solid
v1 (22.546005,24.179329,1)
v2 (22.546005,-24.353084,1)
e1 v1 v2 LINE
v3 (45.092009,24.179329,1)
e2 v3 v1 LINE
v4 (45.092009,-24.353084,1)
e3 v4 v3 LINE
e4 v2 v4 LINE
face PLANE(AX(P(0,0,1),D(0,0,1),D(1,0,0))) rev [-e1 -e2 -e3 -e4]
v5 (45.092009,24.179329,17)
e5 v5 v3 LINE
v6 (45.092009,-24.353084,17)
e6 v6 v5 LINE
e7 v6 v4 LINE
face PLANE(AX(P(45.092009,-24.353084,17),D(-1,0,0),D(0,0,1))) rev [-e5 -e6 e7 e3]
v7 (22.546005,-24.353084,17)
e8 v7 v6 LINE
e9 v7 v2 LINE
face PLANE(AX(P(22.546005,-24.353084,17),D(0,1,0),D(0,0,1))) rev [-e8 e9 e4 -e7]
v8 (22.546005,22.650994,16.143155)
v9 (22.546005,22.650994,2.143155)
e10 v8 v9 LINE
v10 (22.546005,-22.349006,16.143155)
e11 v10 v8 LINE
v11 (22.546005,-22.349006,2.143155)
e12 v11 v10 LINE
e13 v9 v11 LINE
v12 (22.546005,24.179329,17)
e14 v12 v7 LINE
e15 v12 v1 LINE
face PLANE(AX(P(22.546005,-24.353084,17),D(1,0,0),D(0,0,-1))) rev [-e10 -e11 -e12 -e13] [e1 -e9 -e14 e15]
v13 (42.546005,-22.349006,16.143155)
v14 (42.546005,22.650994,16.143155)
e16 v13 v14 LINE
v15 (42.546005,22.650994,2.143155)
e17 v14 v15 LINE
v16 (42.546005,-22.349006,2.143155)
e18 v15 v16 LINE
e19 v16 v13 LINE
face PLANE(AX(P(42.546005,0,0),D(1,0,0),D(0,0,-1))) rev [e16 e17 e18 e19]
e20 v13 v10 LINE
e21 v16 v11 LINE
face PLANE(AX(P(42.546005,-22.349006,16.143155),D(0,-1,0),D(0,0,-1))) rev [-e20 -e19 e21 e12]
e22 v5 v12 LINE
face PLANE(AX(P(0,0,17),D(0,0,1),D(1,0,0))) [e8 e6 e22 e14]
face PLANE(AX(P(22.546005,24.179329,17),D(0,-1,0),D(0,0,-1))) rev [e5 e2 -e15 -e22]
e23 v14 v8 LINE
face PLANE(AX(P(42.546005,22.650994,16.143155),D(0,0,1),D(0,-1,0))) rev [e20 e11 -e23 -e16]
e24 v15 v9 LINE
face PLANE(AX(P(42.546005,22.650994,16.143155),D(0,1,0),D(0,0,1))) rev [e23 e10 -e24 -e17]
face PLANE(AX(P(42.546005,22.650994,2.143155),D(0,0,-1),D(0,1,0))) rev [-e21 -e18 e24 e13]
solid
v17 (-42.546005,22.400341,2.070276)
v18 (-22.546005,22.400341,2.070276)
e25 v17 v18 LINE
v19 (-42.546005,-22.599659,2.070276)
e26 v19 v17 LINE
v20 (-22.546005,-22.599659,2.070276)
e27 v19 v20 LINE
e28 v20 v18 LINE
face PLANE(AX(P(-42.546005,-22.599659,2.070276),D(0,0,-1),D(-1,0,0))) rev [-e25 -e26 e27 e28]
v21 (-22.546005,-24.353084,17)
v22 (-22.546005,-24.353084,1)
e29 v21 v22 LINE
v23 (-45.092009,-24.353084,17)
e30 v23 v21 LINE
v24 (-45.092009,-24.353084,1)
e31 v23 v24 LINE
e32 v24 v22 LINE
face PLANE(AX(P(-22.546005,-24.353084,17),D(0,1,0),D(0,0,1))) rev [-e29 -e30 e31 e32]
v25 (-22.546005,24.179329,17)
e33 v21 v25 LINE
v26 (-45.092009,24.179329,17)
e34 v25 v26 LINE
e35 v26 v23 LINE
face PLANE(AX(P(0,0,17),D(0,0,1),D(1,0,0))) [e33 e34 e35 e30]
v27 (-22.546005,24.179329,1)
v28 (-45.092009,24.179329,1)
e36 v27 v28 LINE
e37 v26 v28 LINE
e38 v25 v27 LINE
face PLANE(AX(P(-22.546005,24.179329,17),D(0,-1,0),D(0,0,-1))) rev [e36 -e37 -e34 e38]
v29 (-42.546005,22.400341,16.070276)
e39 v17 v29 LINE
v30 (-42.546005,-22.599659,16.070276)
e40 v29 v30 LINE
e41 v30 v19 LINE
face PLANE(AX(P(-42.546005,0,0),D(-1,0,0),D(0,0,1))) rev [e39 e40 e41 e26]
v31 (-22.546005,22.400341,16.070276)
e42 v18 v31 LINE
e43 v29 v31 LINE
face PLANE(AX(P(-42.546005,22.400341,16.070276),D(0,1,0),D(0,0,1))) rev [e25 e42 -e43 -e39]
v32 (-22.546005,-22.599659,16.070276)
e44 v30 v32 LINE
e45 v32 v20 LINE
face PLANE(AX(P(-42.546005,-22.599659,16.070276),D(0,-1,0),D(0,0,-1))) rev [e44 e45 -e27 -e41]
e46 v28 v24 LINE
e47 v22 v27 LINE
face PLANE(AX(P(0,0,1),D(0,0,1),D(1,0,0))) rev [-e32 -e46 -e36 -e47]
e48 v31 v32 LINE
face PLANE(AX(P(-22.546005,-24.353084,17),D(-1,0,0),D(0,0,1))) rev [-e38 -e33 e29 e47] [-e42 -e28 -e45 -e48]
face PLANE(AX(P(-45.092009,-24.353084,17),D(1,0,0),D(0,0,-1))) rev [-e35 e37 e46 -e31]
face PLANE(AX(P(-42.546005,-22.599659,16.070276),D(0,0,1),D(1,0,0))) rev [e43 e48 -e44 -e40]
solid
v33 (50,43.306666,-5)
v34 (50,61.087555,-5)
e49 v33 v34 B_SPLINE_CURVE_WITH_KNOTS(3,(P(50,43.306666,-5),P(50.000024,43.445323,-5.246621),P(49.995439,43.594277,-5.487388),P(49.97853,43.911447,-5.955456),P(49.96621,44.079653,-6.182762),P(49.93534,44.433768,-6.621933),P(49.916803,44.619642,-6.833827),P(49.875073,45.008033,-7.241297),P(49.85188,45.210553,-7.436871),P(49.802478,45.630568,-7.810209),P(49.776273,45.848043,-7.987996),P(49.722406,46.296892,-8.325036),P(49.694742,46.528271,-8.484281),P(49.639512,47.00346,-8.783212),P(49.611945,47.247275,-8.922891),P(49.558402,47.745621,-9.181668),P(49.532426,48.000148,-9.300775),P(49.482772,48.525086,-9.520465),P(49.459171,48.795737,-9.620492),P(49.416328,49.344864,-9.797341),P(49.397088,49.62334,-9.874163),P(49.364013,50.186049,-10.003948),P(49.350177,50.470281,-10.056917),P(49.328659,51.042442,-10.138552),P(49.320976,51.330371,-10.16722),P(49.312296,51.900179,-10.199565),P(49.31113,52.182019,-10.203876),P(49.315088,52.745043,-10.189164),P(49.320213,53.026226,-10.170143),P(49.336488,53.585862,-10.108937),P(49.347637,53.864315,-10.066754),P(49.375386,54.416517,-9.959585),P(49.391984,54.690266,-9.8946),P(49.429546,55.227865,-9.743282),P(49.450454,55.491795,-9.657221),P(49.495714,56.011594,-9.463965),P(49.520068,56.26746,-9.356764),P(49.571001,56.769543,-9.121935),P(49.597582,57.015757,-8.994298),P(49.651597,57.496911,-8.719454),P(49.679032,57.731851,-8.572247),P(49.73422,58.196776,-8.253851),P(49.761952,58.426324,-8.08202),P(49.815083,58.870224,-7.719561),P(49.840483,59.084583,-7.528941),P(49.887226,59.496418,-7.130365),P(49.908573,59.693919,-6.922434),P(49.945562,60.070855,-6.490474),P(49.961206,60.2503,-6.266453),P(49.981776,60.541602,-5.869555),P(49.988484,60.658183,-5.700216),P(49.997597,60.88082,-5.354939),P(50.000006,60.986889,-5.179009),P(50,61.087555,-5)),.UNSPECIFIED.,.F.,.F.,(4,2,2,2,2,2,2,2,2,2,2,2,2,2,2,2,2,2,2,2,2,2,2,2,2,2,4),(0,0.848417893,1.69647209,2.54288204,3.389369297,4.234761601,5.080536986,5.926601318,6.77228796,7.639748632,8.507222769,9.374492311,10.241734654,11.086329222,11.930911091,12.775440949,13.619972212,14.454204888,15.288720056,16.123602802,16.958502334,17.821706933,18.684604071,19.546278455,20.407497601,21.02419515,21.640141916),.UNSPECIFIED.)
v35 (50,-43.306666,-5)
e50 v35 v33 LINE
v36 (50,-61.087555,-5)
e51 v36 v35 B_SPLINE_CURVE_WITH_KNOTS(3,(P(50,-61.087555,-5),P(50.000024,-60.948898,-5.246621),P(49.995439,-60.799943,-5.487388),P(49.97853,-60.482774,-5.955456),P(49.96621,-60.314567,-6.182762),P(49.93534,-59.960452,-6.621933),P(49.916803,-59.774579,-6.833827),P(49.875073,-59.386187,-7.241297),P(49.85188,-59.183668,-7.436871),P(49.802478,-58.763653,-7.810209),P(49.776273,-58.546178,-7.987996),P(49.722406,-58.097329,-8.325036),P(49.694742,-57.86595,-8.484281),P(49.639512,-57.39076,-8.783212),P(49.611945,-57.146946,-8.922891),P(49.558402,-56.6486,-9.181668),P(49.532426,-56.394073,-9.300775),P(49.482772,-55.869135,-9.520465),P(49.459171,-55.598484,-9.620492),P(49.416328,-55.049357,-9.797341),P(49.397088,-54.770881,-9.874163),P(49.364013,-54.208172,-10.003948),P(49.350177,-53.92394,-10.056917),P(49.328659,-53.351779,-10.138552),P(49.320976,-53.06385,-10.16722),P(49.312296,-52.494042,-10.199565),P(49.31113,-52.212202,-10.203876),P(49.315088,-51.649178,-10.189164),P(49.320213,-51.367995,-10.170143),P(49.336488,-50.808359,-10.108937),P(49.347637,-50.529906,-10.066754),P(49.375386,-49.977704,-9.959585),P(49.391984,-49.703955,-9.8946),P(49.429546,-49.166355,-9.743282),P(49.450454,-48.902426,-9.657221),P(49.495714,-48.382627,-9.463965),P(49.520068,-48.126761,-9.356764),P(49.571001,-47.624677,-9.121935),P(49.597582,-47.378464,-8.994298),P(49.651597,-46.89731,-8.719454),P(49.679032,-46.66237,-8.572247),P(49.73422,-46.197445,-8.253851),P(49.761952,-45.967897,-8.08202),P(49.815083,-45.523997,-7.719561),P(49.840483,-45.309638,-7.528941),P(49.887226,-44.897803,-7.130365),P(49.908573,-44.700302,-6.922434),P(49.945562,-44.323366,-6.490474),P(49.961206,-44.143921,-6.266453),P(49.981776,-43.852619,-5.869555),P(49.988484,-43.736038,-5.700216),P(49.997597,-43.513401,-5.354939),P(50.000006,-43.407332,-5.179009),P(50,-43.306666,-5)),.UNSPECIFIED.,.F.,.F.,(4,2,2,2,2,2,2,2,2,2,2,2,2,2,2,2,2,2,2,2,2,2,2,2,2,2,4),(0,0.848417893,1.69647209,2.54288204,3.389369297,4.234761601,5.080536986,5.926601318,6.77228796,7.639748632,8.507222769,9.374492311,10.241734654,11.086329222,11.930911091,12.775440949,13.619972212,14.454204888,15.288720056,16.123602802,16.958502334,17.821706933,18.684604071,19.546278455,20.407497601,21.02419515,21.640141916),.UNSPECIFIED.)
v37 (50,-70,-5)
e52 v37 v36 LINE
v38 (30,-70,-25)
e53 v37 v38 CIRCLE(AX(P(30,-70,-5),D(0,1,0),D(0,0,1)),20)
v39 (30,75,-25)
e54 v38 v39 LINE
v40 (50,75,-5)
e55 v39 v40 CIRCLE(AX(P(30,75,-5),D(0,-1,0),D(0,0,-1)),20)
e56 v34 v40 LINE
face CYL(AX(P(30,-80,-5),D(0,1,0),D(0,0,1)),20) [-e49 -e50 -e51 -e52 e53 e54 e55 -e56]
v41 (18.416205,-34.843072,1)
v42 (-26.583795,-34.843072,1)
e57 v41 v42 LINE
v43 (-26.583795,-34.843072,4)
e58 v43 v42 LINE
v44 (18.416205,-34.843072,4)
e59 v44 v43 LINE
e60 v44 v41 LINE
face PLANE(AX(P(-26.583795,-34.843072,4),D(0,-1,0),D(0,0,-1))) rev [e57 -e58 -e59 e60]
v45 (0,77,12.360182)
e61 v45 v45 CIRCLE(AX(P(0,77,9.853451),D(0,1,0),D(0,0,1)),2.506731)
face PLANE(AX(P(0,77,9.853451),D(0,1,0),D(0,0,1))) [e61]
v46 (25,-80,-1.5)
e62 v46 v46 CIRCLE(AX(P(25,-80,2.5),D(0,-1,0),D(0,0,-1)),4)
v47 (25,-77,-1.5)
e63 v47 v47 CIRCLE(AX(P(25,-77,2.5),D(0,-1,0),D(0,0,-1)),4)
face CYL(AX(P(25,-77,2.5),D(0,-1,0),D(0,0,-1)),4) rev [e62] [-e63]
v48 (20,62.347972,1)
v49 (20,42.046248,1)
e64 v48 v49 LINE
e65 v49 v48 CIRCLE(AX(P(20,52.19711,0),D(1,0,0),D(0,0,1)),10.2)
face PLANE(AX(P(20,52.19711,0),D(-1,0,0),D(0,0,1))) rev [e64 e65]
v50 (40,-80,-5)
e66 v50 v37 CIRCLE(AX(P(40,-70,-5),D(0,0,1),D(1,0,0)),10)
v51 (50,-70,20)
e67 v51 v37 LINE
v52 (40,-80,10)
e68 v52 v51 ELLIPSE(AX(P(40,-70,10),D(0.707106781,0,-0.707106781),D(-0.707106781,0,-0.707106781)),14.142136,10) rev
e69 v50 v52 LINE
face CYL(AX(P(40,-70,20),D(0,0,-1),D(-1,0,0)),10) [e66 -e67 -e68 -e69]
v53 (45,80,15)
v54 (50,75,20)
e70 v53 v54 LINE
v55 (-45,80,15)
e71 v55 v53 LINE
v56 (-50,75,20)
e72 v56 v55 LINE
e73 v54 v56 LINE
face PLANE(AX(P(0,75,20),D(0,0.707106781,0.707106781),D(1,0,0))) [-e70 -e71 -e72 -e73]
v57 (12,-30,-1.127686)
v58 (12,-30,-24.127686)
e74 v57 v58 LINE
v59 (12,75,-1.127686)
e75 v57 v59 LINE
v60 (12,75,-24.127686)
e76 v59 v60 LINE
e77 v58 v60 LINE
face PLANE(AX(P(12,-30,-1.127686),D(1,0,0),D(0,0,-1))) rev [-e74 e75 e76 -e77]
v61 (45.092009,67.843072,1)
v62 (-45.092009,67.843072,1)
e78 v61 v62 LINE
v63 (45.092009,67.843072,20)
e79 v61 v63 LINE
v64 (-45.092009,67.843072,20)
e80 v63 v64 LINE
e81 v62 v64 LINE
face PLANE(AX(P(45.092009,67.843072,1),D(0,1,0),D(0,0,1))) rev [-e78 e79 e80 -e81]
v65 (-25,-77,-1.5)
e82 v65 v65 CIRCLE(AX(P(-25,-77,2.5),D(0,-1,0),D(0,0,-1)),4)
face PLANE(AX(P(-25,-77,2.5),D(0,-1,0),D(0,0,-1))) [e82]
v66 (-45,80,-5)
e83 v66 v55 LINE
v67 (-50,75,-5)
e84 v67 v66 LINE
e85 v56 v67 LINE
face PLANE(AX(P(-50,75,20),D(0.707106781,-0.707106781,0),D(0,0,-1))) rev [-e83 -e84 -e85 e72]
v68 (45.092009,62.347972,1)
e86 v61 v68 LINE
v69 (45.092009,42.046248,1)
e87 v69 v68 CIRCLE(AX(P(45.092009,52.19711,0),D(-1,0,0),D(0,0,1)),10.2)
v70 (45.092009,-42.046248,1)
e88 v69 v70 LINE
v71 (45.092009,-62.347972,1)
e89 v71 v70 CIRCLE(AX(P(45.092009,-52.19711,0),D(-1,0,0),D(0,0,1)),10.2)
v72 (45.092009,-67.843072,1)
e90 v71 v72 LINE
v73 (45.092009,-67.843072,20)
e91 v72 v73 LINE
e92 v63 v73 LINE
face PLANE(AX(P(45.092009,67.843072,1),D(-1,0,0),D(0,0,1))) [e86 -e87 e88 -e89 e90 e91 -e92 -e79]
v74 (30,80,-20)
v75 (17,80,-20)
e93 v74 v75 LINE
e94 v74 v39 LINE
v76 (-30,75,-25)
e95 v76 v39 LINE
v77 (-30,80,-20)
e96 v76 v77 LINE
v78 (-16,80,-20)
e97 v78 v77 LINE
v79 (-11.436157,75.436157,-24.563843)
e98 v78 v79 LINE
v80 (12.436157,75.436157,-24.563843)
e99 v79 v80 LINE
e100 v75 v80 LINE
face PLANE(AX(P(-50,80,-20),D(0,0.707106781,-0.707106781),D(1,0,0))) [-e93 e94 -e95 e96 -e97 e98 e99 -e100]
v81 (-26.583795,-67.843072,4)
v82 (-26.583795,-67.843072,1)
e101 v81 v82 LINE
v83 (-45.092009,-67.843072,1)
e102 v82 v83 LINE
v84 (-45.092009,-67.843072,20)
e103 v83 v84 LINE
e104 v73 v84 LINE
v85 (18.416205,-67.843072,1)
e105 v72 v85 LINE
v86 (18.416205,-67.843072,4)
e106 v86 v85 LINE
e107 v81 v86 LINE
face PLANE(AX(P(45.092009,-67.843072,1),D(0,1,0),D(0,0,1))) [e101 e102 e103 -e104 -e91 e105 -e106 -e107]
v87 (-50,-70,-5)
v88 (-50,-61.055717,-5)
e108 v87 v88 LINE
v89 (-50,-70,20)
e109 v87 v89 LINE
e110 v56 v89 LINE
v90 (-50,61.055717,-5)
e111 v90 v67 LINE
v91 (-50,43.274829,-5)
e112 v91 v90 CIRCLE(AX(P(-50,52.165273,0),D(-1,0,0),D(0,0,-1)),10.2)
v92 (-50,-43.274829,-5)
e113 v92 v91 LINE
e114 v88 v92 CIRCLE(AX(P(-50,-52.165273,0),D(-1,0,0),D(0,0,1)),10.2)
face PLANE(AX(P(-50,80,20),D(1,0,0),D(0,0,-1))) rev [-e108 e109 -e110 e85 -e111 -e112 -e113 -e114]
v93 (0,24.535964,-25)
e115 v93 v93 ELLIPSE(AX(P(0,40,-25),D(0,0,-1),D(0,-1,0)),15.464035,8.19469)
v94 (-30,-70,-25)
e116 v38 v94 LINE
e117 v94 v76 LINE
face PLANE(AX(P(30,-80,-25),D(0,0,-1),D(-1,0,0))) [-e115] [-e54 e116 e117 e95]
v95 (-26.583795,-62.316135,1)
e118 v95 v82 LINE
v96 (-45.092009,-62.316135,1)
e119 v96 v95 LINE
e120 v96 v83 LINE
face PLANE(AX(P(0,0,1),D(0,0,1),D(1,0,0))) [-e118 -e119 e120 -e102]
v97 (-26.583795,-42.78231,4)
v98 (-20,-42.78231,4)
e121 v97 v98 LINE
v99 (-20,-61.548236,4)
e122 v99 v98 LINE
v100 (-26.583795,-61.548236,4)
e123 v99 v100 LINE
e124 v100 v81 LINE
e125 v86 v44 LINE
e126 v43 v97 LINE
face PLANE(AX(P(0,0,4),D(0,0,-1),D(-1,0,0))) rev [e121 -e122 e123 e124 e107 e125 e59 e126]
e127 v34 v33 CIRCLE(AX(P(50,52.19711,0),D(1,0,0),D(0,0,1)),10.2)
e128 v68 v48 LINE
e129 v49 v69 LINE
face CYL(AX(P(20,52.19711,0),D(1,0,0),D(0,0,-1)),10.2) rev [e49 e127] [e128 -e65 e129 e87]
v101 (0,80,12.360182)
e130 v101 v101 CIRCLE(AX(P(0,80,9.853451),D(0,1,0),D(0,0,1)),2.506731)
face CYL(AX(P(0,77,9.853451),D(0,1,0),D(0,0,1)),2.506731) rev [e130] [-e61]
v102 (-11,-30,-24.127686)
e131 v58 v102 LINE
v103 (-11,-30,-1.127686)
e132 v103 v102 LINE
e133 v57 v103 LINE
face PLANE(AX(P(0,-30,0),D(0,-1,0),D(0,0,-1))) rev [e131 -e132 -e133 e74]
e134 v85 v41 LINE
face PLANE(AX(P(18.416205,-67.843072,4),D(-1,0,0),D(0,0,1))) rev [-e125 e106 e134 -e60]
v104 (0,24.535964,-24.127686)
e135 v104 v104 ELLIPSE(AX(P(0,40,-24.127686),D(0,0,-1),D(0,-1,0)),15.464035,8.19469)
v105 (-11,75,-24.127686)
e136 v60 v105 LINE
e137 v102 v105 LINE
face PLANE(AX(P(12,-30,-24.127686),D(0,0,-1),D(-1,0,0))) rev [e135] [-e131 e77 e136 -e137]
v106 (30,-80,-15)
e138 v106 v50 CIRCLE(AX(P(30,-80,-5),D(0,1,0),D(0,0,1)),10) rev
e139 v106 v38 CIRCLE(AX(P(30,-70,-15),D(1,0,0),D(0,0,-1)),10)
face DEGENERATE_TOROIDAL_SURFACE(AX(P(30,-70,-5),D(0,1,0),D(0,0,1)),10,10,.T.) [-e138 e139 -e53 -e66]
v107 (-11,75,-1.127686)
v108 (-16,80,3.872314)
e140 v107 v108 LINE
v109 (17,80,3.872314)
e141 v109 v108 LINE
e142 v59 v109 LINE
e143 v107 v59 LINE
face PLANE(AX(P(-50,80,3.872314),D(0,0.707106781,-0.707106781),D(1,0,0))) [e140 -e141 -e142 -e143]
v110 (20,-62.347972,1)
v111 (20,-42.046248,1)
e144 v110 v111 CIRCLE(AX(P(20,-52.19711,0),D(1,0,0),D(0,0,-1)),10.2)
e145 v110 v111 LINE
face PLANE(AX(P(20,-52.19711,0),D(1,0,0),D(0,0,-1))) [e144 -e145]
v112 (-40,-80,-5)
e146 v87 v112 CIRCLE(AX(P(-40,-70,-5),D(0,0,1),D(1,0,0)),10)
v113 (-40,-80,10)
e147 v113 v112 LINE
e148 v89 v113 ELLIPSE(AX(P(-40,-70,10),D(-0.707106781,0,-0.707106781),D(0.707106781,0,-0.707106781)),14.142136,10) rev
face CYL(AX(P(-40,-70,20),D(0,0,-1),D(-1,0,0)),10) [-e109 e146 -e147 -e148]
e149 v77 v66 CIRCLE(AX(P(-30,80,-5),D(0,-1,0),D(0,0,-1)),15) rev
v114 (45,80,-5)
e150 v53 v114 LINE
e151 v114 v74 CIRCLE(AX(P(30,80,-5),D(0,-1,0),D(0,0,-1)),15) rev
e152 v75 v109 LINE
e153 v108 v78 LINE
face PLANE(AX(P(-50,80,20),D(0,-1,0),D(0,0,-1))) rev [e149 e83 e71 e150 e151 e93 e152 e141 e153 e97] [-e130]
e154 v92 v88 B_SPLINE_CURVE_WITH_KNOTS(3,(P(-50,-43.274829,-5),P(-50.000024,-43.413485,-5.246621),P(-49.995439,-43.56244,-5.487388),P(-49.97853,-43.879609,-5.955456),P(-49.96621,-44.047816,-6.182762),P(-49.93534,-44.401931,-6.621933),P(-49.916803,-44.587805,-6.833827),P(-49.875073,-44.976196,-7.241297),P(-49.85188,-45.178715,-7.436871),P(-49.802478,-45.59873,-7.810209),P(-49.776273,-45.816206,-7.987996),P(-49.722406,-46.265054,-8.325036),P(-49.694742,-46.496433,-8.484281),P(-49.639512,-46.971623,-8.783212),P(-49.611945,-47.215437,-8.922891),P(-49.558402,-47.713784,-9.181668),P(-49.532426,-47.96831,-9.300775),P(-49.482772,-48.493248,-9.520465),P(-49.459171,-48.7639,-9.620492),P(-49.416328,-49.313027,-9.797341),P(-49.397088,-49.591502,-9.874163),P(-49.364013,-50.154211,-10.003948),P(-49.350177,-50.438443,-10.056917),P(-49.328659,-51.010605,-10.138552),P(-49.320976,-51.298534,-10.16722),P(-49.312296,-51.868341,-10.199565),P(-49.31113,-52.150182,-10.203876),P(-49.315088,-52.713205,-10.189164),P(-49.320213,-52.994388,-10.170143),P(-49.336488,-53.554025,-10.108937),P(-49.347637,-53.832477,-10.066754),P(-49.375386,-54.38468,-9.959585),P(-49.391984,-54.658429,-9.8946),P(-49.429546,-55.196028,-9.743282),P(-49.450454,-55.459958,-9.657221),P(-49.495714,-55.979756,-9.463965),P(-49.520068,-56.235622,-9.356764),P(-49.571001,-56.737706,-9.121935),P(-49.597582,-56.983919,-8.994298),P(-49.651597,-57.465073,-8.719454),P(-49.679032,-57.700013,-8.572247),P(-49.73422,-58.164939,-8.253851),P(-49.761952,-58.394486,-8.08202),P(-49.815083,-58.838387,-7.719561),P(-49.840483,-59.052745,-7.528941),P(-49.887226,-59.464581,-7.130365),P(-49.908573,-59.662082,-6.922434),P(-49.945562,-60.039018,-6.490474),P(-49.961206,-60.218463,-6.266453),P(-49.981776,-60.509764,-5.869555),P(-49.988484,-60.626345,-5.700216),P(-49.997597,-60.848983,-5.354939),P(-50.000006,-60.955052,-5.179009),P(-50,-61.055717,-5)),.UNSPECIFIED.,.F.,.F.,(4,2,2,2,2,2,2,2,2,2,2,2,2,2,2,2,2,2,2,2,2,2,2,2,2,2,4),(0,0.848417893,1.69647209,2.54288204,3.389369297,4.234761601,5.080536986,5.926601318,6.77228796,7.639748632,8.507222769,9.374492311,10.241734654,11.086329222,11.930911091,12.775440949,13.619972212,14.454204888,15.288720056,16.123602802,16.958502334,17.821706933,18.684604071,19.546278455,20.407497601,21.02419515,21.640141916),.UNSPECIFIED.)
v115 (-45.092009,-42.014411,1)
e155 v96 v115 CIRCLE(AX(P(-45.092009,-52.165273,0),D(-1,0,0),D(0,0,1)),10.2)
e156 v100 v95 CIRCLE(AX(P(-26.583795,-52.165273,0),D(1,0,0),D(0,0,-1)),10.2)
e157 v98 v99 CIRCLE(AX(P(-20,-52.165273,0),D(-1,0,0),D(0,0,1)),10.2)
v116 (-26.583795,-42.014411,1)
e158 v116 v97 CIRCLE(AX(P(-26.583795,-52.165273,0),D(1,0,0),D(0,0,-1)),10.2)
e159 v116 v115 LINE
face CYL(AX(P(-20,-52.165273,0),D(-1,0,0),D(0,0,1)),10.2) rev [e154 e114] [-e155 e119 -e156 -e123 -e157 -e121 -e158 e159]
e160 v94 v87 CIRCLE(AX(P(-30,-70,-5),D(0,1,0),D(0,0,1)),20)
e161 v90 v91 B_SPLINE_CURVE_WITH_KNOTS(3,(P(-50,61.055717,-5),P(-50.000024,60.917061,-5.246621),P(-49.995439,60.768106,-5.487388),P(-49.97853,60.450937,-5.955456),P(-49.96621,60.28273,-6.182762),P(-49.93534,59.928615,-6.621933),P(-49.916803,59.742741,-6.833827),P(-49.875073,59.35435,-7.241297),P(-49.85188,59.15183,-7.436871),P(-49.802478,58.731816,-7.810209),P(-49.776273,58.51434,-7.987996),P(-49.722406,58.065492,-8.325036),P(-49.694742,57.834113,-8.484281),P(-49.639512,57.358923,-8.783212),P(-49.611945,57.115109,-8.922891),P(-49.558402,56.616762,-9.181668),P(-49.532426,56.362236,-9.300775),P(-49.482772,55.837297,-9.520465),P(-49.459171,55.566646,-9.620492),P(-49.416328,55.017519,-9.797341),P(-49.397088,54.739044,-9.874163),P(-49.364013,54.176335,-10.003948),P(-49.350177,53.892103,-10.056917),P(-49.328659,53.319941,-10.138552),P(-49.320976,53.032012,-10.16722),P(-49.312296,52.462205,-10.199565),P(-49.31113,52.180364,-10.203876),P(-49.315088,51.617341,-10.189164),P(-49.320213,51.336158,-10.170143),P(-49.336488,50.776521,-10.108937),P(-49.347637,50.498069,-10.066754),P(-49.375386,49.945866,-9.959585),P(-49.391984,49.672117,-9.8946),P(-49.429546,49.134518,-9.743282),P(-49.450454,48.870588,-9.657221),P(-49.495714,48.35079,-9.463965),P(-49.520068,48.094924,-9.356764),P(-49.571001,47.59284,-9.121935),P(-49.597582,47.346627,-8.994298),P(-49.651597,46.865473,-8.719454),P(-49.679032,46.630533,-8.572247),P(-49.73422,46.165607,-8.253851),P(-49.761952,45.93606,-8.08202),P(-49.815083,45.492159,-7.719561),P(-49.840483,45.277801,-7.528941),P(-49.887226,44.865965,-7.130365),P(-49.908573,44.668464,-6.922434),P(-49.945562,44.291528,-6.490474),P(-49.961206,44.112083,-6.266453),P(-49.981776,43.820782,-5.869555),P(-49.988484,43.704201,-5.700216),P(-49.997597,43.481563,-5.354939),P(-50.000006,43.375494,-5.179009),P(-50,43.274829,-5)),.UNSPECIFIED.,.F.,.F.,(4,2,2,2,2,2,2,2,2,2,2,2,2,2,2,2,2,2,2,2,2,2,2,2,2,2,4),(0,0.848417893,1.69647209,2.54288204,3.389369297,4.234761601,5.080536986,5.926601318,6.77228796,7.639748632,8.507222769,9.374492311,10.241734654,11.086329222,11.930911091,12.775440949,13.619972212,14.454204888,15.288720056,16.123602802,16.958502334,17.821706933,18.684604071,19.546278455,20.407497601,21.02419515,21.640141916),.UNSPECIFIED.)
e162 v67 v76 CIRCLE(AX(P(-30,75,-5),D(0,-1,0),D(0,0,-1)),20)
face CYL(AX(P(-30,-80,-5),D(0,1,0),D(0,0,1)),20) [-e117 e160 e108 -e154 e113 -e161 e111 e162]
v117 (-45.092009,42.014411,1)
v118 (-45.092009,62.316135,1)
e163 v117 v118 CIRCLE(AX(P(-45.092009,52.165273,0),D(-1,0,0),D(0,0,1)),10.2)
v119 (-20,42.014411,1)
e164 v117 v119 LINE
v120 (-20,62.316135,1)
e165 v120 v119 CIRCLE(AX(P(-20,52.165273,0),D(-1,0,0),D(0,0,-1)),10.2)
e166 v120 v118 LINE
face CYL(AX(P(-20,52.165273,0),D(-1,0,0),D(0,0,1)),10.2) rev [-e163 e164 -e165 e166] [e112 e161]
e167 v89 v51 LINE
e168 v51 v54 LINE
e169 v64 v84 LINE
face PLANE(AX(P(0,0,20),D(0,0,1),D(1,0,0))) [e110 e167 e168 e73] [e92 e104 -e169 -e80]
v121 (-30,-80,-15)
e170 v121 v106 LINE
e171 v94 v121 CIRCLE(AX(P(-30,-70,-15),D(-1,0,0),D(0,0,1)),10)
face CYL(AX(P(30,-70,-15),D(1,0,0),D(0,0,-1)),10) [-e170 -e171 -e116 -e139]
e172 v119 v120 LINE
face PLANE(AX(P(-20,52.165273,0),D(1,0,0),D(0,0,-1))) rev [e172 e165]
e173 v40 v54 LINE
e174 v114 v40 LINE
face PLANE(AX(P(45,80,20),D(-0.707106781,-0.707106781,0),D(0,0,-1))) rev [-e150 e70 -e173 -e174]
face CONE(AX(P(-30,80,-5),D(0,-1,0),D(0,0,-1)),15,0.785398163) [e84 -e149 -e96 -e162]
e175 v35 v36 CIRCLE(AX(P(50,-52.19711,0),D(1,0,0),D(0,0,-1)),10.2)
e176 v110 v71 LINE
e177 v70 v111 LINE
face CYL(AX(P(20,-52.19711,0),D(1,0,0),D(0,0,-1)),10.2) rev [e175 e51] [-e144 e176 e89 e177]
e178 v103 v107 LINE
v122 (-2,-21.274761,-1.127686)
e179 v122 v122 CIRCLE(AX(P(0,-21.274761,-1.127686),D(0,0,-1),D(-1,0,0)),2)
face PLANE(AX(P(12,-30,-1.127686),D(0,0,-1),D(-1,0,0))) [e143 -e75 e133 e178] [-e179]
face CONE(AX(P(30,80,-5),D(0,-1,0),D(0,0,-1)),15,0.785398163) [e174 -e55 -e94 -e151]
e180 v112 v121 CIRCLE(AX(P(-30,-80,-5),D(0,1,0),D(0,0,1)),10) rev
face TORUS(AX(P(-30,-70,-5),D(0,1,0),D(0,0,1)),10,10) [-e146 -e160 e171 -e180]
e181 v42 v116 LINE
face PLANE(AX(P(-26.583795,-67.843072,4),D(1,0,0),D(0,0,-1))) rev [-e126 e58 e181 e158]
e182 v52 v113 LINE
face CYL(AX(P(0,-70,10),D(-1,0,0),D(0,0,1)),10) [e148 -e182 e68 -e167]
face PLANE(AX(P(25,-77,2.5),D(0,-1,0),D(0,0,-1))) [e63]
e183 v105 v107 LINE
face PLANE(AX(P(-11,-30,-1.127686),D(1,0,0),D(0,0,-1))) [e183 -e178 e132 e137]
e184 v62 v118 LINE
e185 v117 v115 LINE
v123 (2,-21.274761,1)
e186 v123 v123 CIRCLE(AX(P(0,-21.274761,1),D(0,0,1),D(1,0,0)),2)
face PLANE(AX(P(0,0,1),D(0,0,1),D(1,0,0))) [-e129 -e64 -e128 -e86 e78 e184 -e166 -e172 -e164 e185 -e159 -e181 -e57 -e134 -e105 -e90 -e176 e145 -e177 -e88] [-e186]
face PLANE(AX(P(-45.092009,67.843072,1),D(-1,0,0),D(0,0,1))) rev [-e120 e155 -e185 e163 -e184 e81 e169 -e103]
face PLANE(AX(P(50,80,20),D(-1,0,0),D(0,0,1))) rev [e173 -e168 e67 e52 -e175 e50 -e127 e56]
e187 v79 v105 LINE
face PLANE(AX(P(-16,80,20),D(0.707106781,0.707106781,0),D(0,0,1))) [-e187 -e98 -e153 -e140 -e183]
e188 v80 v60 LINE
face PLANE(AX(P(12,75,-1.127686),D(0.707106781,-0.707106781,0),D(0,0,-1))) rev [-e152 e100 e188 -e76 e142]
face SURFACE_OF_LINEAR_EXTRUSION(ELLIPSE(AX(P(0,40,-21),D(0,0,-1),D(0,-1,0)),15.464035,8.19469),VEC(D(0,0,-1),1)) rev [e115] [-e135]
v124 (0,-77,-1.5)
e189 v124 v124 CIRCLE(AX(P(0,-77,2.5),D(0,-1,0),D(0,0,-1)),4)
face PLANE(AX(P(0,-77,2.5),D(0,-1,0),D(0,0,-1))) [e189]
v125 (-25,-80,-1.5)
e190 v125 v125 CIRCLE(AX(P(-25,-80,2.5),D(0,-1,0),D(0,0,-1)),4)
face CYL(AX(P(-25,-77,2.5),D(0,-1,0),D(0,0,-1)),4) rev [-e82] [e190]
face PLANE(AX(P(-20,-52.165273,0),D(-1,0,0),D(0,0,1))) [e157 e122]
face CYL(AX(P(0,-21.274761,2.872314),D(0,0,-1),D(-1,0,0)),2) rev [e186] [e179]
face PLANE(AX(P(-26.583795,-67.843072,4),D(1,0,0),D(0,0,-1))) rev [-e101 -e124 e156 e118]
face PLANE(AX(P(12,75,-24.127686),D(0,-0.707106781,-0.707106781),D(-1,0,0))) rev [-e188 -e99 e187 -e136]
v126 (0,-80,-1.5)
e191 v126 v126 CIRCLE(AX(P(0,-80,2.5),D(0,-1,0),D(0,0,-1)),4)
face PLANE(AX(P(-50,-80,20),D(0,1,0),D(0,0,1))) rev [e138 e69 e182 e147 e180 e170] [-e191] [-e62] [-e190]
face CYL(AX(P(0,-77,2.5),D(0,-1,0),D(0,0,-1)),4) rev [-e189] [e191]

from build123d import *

# Parameters (mm, degrees)
SKETCH1_W             = 100
SKETCH1_H             = 160
BOSS_EXTRUDE1_DEPTH   = 20
BOSS_EXTRUDE2_DEPTH   = 160
FILLET4_R             = 10
SKETCH11_W            = 90.184018432
SKETCH11_H            = 135.686144012
CUT_EXTRUDE3_DEPTH    = 19
SKETCH12_W            = 23
SKETCH12_H            = 23
CUT_EXTRUDE4_DEPTH    = 110
SKETCH13_RX           = 15.4640355
SKETCH13_RY           = 8.1946903
CUT_EXTRUDE5_DEPTH    = 4
SKETCH15_R            = 2
CUT_EXTRUDE6_DEPTH    = 4
SKETCH22_W            = 22.546004608
SKETCH22_H            = 48.532413032
BOSS_EXTRUDE7_DEPTH   = 16
BOSS_EXTRUDE7_2_DEPTH = 16
SKETCH26_W            = 45
SKETCH26_H            = 33
BOSS_EXTRUDE8_DEPTH   = 3
SKETCH27_R            = 4
CUT_EXTRUDE13_DEPTH   = 3
SKETCH28_R            = 2.506731261
CUT_EXTRUDE14_DEPTH   = 3
SKETCH14_R            = 10.2
CUT_EXTRUDE15_DEPTH   = 30
SKETCH17_R            = 10.2
CUT_EXTRUDE16_DEPTH   = 30
SKETCH23_W            = 14
SKETCH23_H            = 45
CUT_EXTRUDE17_DEPTH   = 20
SKETCH24_W            = 14
SKETCH24_H            = 45
CUT_EXTRUDE18_DEPTH   = 20


with BuildPart() as part:
    # Sketch1 → Boss-Extrude1 (new body)
    with BuildSketch(Plane.XY):
        Rectangle(SKETCH1_W, SKETCH1_H)
    extrude(amount=BOSS_EXTRUDE1_DEPTH)

    # Sketch5 → Boss-Extrude2 (add)
    with BuildSketch(Plane(origin=(0, 80, 0), x_dir=(1, 0, 0), z_dir=(0, 1, 0))):
        with BuildLine():
            Line((50, 0), (-50, 0))
            Line((-50, 0), (-50, 5))
            ThreePointArc((-50, 5), (-44.142135624, 19.142135624), (-30, 25))
            Line((-30, 25), (30, 25))
            ThreePointArc((30, 25), (44.142135624, 19.142135624), (50, 5))
            Line((50, 5), (50, 0))
        make_face()
    extrude(amount=-BOSS_EXTRUDE2_DEPTH)

    # Fillet4
    fillet4_edges = [part.edges().sort_by_distance(p)[0] for p in [
        (-44.142135624, -80, -19.142135624),
        (0, -80, -25),
        (44.142135624, -80, -19.142135624),
        (0, -80, 20),
        (50, -80, 7.5),
        (-50, -80, 7.5),
    ]]
    fillet(fillet4_edges, radius=FILLET4_R)

    # Sketch11 → Cut-Extrude3 (cut)
    with BuildSketch(Plane.XY.offset(20)):
        Rectangle(SKETCH11_W, SKETCH11_H)
    extrude(amount=-CUT_EXTRUDE3_DEPTH, mode=Mode.SUBTRACT)

    # Sketch12 → Cut-Extrude4 (cut)
    with BuildSketch(Plane(origin=(0, 80, 0), x_dir=(1, 0, 0), z_dir=(0, 1, 0))):
        with Locations((0.5, 12.627685957)):
            Rectangle(SKETCH12_W, SKETCH12_H)
    extrude(amount=-CUT_EXTRUDE4_DEPTH, mode=Mode.SUBTRACT)

    # Sketch13 → Cut-Extrude5 (cut)
    with BuildSketch(Plane(origin=(0, 0, -25), x_dir=(-1, 0, 0), z_dir=(0, 0, -1))):
        with Locations(Location((0, 40), (0, 0, -90))):
            Ellipse(SKETCH13_RX, SKETCH13_RY)
    extrude(amount=-CUT_EXTRUDE5_DEPTH, mode=Mode.SUBTRACT)

    # Sketch15 → Cut-Extrude6 (cut)
    with BuildSketch(Plane(origin=(0, 0, -1.127685957), x_dir=(-1, 0, 0), z_dir=(0, 0, -1))):
        with Locations((0, -21.274761421)):
            Circle(SKETCH15_R)
    extrude(amount=-CUT_EXTRUDE6_DEPTH, mode=Mode.SUBTRACT)

    # Chamfer1
    # the kernel refuses this chamfer: 5 mm, written as the material it takes off along each edge
    with BuildSketch(Plane(origin=(30, 80, -5), x_dir=(0, 0, -1), z_dir=(-1, 0, 0))) as chamfer1_piece_1:
        with BuildLine():
            Line((14.858578644, -0.141421356), (20.141421356, 5.141421356))
            Line((20.141421356, 5.141421356), (20.241421356, 5.141421356))
            ThreePointArc((20.241421356, 5.141421356), (20.1, 2.570710678), (20.1, 0))
            Line((20.1, 0), (20, -0.1))
            ThreePointArc((20, -0.1), (17.429289322, -0.1), (14.858578644, -0.241421356))
            Line((14.858578644, -0.241421356), (14.858578644, -0.141421356))
        make_face()
    revolve(axis=Axis((30, 80, -5), (0, -1, 0)), revolution_arc=90, mode=Mode.SUBTRACT)
    with BuildSketch(Plane(origin=(-30, 80, -25), x_dir=(0, 0.0274958766105877, 0.9996219169112968), z_dir=(1, 0, 0))) as chamfer1_piece_2:
        with BuildLine():
            Line((5.143365976, 0), (-0.282735774, 5.135588968))
            Line((-0.282735774, 5.135588968), (-0.382697966, 5.13283938))
            ThreePointArc((-0.382697966, 5.13283938), (-0.170646135, 2.566989148), (-0.099962192, -0.002749588))
            Line((-0.099962192, -0.002749588), (0.002749588, -0.099962192))
            ThreePointArc((0.002749588, -0.099962192), (2.572488324, -0.029278248), (5.146115564, -0.099962192))
            Line((5.146115564, -0.099962192), (5.143365976, 0))
        make_face()
    extrude(amount=60, mode=Mode.SUBTRACT)
    with BuildSketch(Plane(origin=(-30, 80, -5), x_dir=(-1, 0, 0), z_dir=(0, 0, 1))) as chamfer1_piece_3:
        with BuildLine():
            Line((14.858578644, -0.141421356), (20.141421356, 5.141421356))
            Line((20.141421356, 5.141421356), (20.241421356, 5.141421356))
            ThreePointArc((20.241421356, 5.141421356), (20.1, 2.570710678), (20.1, 0))
            Line((20.1, 0), (20, -0.1))
            ThreePointArc((20, -0.1), (17.429289322, -0.1), (14.858578644, -0.241421356))
            Line((14.858578644, -0.241421356), (14.858578644, -0.141421356))
        make_face()
    revolve(axis=Axis((-30, 80, -5), (0, -1, 0)), revolution_arc=90, mode=Mode.SUBTRACT)
    with BuildSketch(Plane(origin=(12, 80, -1.127685957), x_dir=(0, 0.0274958766105877, 0.9996219169112968), z_dir=(-1, 0, 0)), Plane(origin=(-11, 80, -1.127685957), x_dir=(-0.9996219169112968, 0.0274958766105877, 0), z_dir=(0, 0, -1)), Plane(origin=(12, 80, -24.127685957), x_dir=(0.9996219169112965, 0.027495876610587732, 0), z_dir=(0, 0, 1)), Plane(origin=(-11, 80, -24.127685957), x_dir=(0, 0.0274958766105877, -0.9996219169112968), z_dir=(1, 0, 0))) as chamfer1_piece_4:
        with BuildLine():
            Line((5.143365976, 0), (-0.282735774, -5.135588968))
            Line((-0.282735774, -5.135588968), (-0.382697966, -5.13283938))
            ThreePointArc((-0.382697966, -5.13283938), (-0.170646135, -2.566989148), (-0.099962192, 0.002749588))
            Line((-0.099962192, 0.002749588), (0.002749588, 0.099962192))
            ThreePointArc((0.002749588, 0.099962192), (2.572488324, 0.029278248), (5.146115564, 0.099962192))
            Line((5.146115564, 0.099962192), (5.143365976, 0))
        make_face()
    extrude(amount=23, mode=Mode.SUBTRACT)
    with BuildSketch(Plane(origin=(-50, 80, -5), x_dir=(-0.027495876610586282, -0.9996219169112968, 0), z_dir=(0, 0, 1))) as chamfer1_piece_5:
        with BuildLine():
            Line((5.143365976, 0), (-0.282735774, 5.135588968))
            Line((-0.282735774, 5.135588968), (-0.382697966, 5.13283938))
            ThreePointArc((-0.382697966, 5.13283938), (-0.170646135, 2.566989148), (-0.099962192, -0.002749588))
            Line((-0.099962192, -0.002749588), (0.002749588, -0.099962192))
            ThreePointArc((0.002749588, -0.099962192), (2.572488324, -0.029278248), (5.146115564, -0.099962192))
            Line((5.146115564, -0.099962192), (5.143365976, 0))
        make_face()
    extrude(amount=25, mode=Mode.SUBTRACT)
    with BuildSketch(Plane(origin=(50, 80, 20), x_dir=(-0.9996219169112968, 0.0274958766105877, 0), z_dir=(0, 0, -1))) as chamfer1_piece_6:
        with BuildLine():
            Line((5.143365976, 0), (-0.282735774, -5.135588968))
            Line((-0.282735774, -5.135588968), (-0.382697966, -5.13283938))
            ThreePointArc((-0.382697966, -5.13283938), (-0.170646135, -2.566989148), (-0.099962192, 0.002749588))
            Line((-0.099962192, 0.002749588), (0.002749588, 0.099962192))
            ThreePointArc((0.002749588, 0.099962192), (2.572488324, 0.029278248), (5.146115564, 0.099962192))
            Line((5.146115564, 0.099962192), (5.143365976, 0))
        make_face()
    extrude(amount=25, mode=Mode.SUBTRACT)
    with BuildSketch(Plane(origin=(-50, 80, 20), x_dir=(0, -0.9996219169112968, 0.027495876610586282), z_dir=(1, 0, 0))) as chamfer1_piece_7:
        with BuildLine():
            Line((5.143365976, 0), (-0.282735774, 5.135588968))
            Line((-0.282735774, 5.135588968), (-0.382697966, 5.13283938))
            ThreePointArc((-0.382697966, 5.13283938), (-0.170646135, 2.566989148), (-0.099962192, -0.002749588))
            Line((-0.099962192, -0.002749588), (0.002749588, -0.099962192))
            ThreePointArc((0.002749588, -0.099962192), (2.572488324, -0.029278248), (5.146115564, -0.099962192))
            Line((5.146115564, -0.099962192), (5.143365976, 0))
        make_face()
    extrude(amount=100, mode=Mode.SUBTRACT)
    with BuildSketch(Plane(origin=(12, 80, -24.127685957), x_dir=(0.9996219169112965, 0.027495876610587732, 0), z_dir=(0, 0, 1))) as chamfer1_piece_8a_section:
        with BuildLine():
            Line((5.143365976, 0), (-0.282735774, -5.135588968))
            Line((-0.282735774, -5.135588968), (-0.382697966, -5.13283938))
            ThreePointArc((-0.382697966, -5.13283938), (-0.170646135, -2.566989148), (-0.099962192, 0.002749588))
            Line((-0.099962192, 0.002749588), (0.002749588, 0.099962192))
            ThreePointArc((0.002749588, 0.099962192), (2.572488324, 0.029278248), (5.146115564, 0.099962192))
            Line((5.146115564, 0.099962192), (5.143365976, 0))
        make_face()
    chamfer1_piece_8a = extrude(amount=35.85841494, mode=Mode.PRIVATE)
    chamfer1_piece_8a = split(chamfer1_piece_8a, bisect_by=Plane(origin=(13.648968134, 78.351031866, -1.127685957), z_dir=(0, 0, 1)), keep=Keep.TOP, mode=Mode.PRIVATE)
    with BuildSketch(Plane(origin=(24.85841494, 80, -1.127685957), x_dir=(0, 0.0274958766105877, 0.9996219169112968), z_dir=(-1, 0, 0))) as chamfer1_piece_8b_section:
        with BuildLine():
            Line((5.143365976, 0), (-0.282735774, -5.135588968))
            Line((-0.282735774, -5.135588968), (-0.382697966, -5.13283938))
            ThreePointArc((-0.382697966, -5.13283938), (-0.170646135, -2.566989148), (-0.099962192, 0.002749588))
            Line((-0.099962192, 0.002749588), (0.002749588, 0.099962192))
            ThreePointArc((0.002749588, 0.099962192), (2.572488324, 0.029278248), (5.146115564, 0.099962192))
            Line((5.146115564, 0.099962192), (5.143365976, 0))
        make_face()
    chamfer1_piece_8b = extrude(amount=35.85841494, mode=Mode.PRIVATE)
    chamfer1_piece_8b = split(chamfer1_piece_8b, bisect_by=Plane(origin=(12, 78.351031866, 0.521282178), z_dir=(1, 0, 0)), keep=Keep.TOP, mode=Mode.PRIVATE)
    chamfer1_piece_8 = chamfer1_piece_8a & chamfer1_piece_8b
    add(chamfer1_piece_8, mode=Mode.SUBTRACT)
    with BuildSketch(Plane(origin=(-11, 80, 11.730728983), x_dir=(-0.9996219169112968, 0.0274958766105877, 0), z_dir=(0, 0, -1))) as chamfer1_piece_9a_section:
        with BuildLine():
            Line((5.143365976, 0), (-0.282735774, -5.135588968))
            Line((-0.282735774, -5.135588968), (-0.382697966, -5.13283938))
            ThreePointArc((-0.382697966, -5.13283938), (-0.170646135, -2.566989148), (-0.099962192, 0.002749588))
            Line((-0.099962192, 0.002749588), (0.002749588, 0.099962192))
            ThreePointArc((0.002749588, 0.099962192), (2.572488324, 0.029278248), (5.146115564, 0.099962192))
            Line((5.146115564, 0.099962192), (5.143365976, 0))
        make_face()
    chamfer1_piece_9a = extrude(amount=35.85841494, mode=Mode.PRIVATE)
    chamfer1_piece_9a = split(chamfer1_piece_9a, bisect_by=Plane(origin=(-12.648968134, 78.351031866, -1.127685957), z_dir=(0, 0, 1)), keep=Keep.TOP, mode=Mode.PRIVATE)
    with BuildSketch(Plane(origin=(12, 80, -1.127685957), x_dir=(0, 0.0274958766105877, 0.9996219169112968), z_dir=(-1, 0, 0))) as chamfer1_piece_9b_section:
        with BuildLine():
            Line((5.143365976, 0), (-0.282735774, -5.135588968))
            Line((-0.282735774, -5.135588968), (-0.382697966, -5.13283938))
            ThreePointArc((-0.382697966, -5.13283938), (-0.170646135, -2.566989148), (-0.099962192, 0.002749588))
            Line((-0.099962192, 0.002749588), (0.002749588, 0.099962192))
            ThreePointArc((0.002749588, 0.099962192), (2.572488324, 0.029278248), (5.146115564, 0.099962192))
            Line((5.146115564, 0.099962192), (5.143365976, 0))
        make_face()
    chamfer1_piece_9b = extrude(amount=35.85841494, mode=Mode.PRIVATE)
    chamfer1_piece_9b = split(chamfer1_piece_9b, bisect_by=Plane(origin=(-11, 78.351031866, 0.521282178), z_dir=(-1, 0, 0)), keep=Keep.TOP, mode=Mode.PRIVATE)
    chamfer1_piece_9 = chamfer1_piece_9a & chamfer1_piece_9b
    add(chamfer1_piece_9, mode=Mode.SUBTRACT)
    with BuildSketch(Plane(origin=(-23.85841494, 80, -24.127685957), x_dir=(0, 0.0274958766105877, -0.9996219169112968), z_dir=(1, 0, 0))) as chamfer1_piece_10a_section:
        with BuildLine():
            Line((5.143365976, 0), (-0.282735774, -5.135588968))
            Line((-0.282735774, -5.135588968), (-0.382697966, -5.13283938))
            ThreePointArc((-0.382697966, -5.13283938), (-0.170646135, -2.566989148), (-0.099962192, 0.002749588))
            Line((-0.099962192, 0.002749588), (0.002749588, 0.099962192))
            ThreePointArc((0.002749588, 0.099962192), (2.572488324, 0.029278248), (5.146115564, 0.099962192))
            Line((5.146115564, 0.099962192), (5.143365976, 0))
        make_face()
    chamfer1_piece_10a = extrude(amount=35.85841494, mode=Mode.PRIVATE)
    chamfer1_piece_10a = split(chamfer1_piece_10a, bisect_by=Plane(origin=(-11, 78.351031866, -25.776654091), z_dir=(-1, 0, 0)), keep=Keep.TOP, mode=Mode.PRIVATE)
    with BuildSketch(Plane(origin=(-11, 80, -1.127685957), x_dir=(-0.9996219169112968, 0.0274958766105877, 0), z_dir=(0, 0, -1))) as chamfer1_piece_10b_section:
        with BuildLine():
            Line((5.143365976, 0), (-0.282735774, -5.135588968))
            Line((-0.282735774, -5.135588968), (-0.382697966, -5.13283938))
            ThreePointArc((-0.382697966, -5.13283938), (-0.170646135, -2.566989148), (-0.099962192, 0.002749588))
            Line((-0.099962192, 0.002749588), (0.002749588, 0.099962192))
            ThreePointArc((0.002749588, 0.099962192), (2.572488324, 0.029278248), (5.146115564, 0.099962192))
            Line((5.146115564, 0.099962192), (5.143365976, 0))
        make_face()
    chamfer1_piece_10b = extrude(amount=35.85841494, mode=Mode.PRIVATE)
    chamfer1_piece_10b = split(chamfer1_piece_10b, bisect_by=Plane(origin=(-12.648968134, 78.351031866, -24.127685957), z_dir=(0, 0, -1)), keep=Keep.TOP, mode=Mode.PRIVATE)
    chamfer1_piece_10 = chamfer1_piece_10a & chamfer1_piece_10b
    add(chamfer1_piece_10, mode=Mode.SUBTRACT)
    with BuildSketch(Plane(origin=(12, 80, -36.986100896), x_dir=(0.9996219169112965, 0.027495876610587732, 0), z_dir=(0, 0, 1))) as chamfer1_piece_11a_section:
        with BuildLine():
            Line((5.143365976, 0), (-0.282735774, -5.135588968))
            Line((-0.282735774, -5.135588968), (-0.382697966, -5.13283938))
            ThreePointArc((-0.382697966, -5.13283938), (-0.170646135, -2.566989148), (-0.099962192, 0.002749588))
            Line((-0.099962192, 0.002749588), (0.002749588, 0.099962192))
            ThreePointArc((0.002749588, 0.099962192), (2.572488324, 0.029278248), (5.146115564, 0.099962192))
            Line((5.146115564, 0.099962192), (5.143365976, 0))
        make_face()
    chamfer1_piece_11a = extrude(amount=35.85841494, mode=Mode.PRIVATE)
    chamfer1_piece_11a = split(chamfer1_piece_11a, bisect_by=Plane(origin=(13.648968134, 78.351031866, -24.127685957), z_dir=(0, 0, -1)), keep=Keep.TOP, mode=Mode.PRIVATE)
    with BuildSketch(Plane(origin=(-11, 80, -24.127685957), x_dir=(0, 0.0274958766105877, -0.9996219169112968), z_dir=(1, 0, 0))) as chamfer1_piece_11b_section:
        with BuildLine():
            Line((5.143365976, 0), (-0.282735774, -5.135588968))
            Line((-0.282735774, -5.135588968), (-0.382697966, -5.13283938))
            ThreePointArc((-0.382697966, -5.13283938), (-0.170646135, -2.566989148), (-0.099962192, 0.002749588))
            Line((-0.099962192, 0.002749588), (0.002749588, 0.099962192))
            ThreePointArc((0.002749588, 0.099962192), (2.572488324, 0.029278248), (5.146115564, 0.099962192))
            Line((5.146115564, 0.099962192), (5.143365976, 0))
        make_face()
    chamfer1_piece_11b = extrude(amount=35.85841494, mode=Mode.PRIVATE)
    chamfer1_piece_11b = split(chamfer1_piece_11b, bisect_by=Plane(origin=(12, 78.351031866, -25.776654091), z_dir=(1, 0, 0)), keep=Keep.TOP, mode=Mode.PRIVATE)
    chamfer1_piece_11 = chamfer1_piece_11a & chamfer1_piece_11b
    add(chamfer1_piece_11, mode=Mode.SUBTRACT)
    with BuildSketch(Plane(origin=(-50, 80, -5), x_dir=(-0.027495876610586282, -0.9996219169112968, 0), z_dir=(0, 0, 1))) as chamfer1_piece_12a_section:
        with BuildLine():
            Line((5.143365976, 0), (-0.282735774, 5.135588968))
            Line((-0.282735774, 5.135588968), (-0.382697966, 5.13283938))
            ThreePointArc((-0.382697966, 5.13283938), (-0.170646135, 2.566989148), (-0.099962192, -0.002749588))
            Line((-0.099962192, -0.002749588), (0.002749588, -0.099962192))
            ThreePointArc((0.002749588, -0.099962192), (2.572488324, -0.029278248), (5.146115564, -0.099962192))
            Line((5.146115564, -0.099962192), (5.143365976, 0))
        make_face()
    chamfer1_piece_12a = extrude(amount=37.85841494, mode=Mode.PRIVATE)
    chamfer1_piece_12a = split(chamfer1_piece_12a, bisect_by=Plane(origin=(-48.351031866, 78.351031866, 20), z_dir=(0, 0, 1)), keep=Keep.TOP, mode=Mode.PRIVATE)
    with BuildSketch(Plane(origin=(-62.85841494, 80, 20), x_dir=(0, -0.9996219169112968, 0.027495876610586282), z_dir=(1, 0, 0))) as chamfer1_piece_12b_section:
        with BuildLine():
            Line((5.143365976, 0), (-0.282735774, 5.135588968))
            Line((-0.282735774, 5.135588968), (-0.382697966, 5.13283938))
            ThreePointArc((-0.382697966, 5.13283938), (-0.170646135, 2.566989148), (-0.099962192, -0.002749588))
            Line((-0.099962192, -0.002749588), (0.002749588, -0.099962192))
            ThreePointArc((0.002749588, -0.099962192), (2.572488324, -0.029278248), (5.146115564, -0.099962192))
            Line((5.146115564, -0.099962192), (5.143365976, 0))
        make_face()
    chamfer1_piece_12b = extrude(amount=112.85841494, mode=Mode.PRIVATE)
    chamfer1_piece_12b = split(chamfer1_piece_12b, bisect_by=Plane(origin=(-50, 78.351031866, 18.351031866), z_dir=(-1, 0, 0)), keep=Keep.TOP, mode=Mode.PRIVATE)
    chamfer1_piece_12 = chamfer1_piece_12a & chamfer1_piece_12b
    add(chamfer1_piece_12, mode=Mode.SUBTRACT)
    with BuildSketch(Plane(origin=(-50, 80, 20), x_dir=(0, -0.9996219169112968, 0.027495876610586282), z_dir=(1, 0, 0))) as chamfer1_piece_13a_section:
        with BuildLine():
            Line((5.143365976, 0), (-0.282735774, 5.135588968))
            Line((-0.282735774, 5.135588968), (-0.382697966, 5.13283938))
            ThreePointArc((-0.382697966, 5.13283938), (-0.170646135, 2.566989148), (-0.099962192, -0.002749588))
            Line((-0.099962192, -0.002749588), (0.002749588, -0.099962192))
            ThreePointArc((0.002749588, -0.099962192), (2.572488324, -0.029278248), (5.146115564, -0.099962192))
            Line((5.146115564, -0.099962192), (5.143365976, 0))
        make_face()
    chamfer1_piece_13a = extrude(amount=112.85841494, mode=Mode.PRIVATE)
    chamfer1_piece_13a = split(chamfer1_piece_13a, bisect_by=Plane(origin=(50, 78.351031866, 18.351031866), z_dir=(1, 0, 0)), keep=Keep.TOP, mode=Mode.PRIVATE)
    with BuildSketch(Plane(origin=(50, 80, 32.85841494), x_dir=(-0.9996219169112968, 0.0274958766105877, 0), z_dir=(0, 0, -1))) as chamfer1_piece_13b_section:
        with BuildLine():
            Line((5.143365976, 0), (-0.282735774, -5.135588968))
            Line((-0.282735774, -5.135588968), (-0.382697966, -5.13283938))
            ThreePointArc((-0.382697966, -5.13283938), (-0.170646135, -2.566989148), (-0.099962192, 0.002749588))
            Line((-0.099962192, 0.002749588), (0.002749588, 0.099962192))
            ThreePointArc((0.002749588, 0.099962192), (2.572488324, 0.029278248), (5.146115564, 0.099962192))
            Line((5.146115564, 0.099962192), (5.143365976, 0))
        make_face()
    chamfer1_piece_13b = extrude(amount=37.85841494, mode=Mode.PRIVATE)
    chamfer1_piece_13b = split(chamfer1_piece_13b, bisect_by=Plane(origin=(48.351031866, 78.351031866, 20), z_dir=(0, 0, 1)), keep=Keep.TOP, mode=Mode.PRIVATE)
    chamfer1_piece_13 = chamfer1_piece_13a & chamfer1_piece_13b
    add(chamfer1_piece_13, mode=Mode.SUBTRACT)

    # Sketch26 → Boss-Extrude8 (add)
    with BuildSketch(Plane.XY.offset(1)):
        with Locations((-4.083795183, -51.343072006)):
            Rectangle(SKETCH26_W, SKETCH26_H)
    extrude(amount=BOSS_EXTRUDE8_DEPTH)

    # Sketch27 → Cut-Extrude13 (cut)
    with BuildSketch(Plane.XZ.offset(80)):
        with Locations(Location((0, 2.5, 0), (0, 0, 270))):
            Circle(SKETCH27_R)
        with Locations(Location((-25, 2.5, 0), (0, 0, 270))):
            Circle(SKETCH27_R)
        with Locations(Location((25, 2.5, 0), (0, 0, 270))):
            Circle(SKETCH27_R)
    extrude(amount=-CUT_EXTRUDE13_DEPTH, mode=Mode.SUBTRACT)

    # Sketch28 → Cut-Extrude14 (cut)
    with BuildSketch(Plane(origin=(0, 80, 0), x_dir=(1, 0, 0), z_dir=(0, 1, 0))):
        with Locations(Location((0, -9.853450589, 0), (0, 0, 270))):
            Circle(SKETCH28_R)
    extrude(amount=-CUT_EXTRUDE14_DEPTH, mode=Mode.SUBTRACT)

    # Sketch14 → Cut-Extrude15 (cut)
    with BuildSketch(Plane(origin=(50, 0, 0), x_dir=(0, 0, -1), z_dir=(1, 0, 0))):
        with Locations(Location((0, -52.197110406, 0), (0, 0, 299.353470055))):
            Circle(SKETCH14_R)
        with Locations(Location((0, 52.197110406, 0), (0, 0, 60.646529945))):
            Circle(SKETCH14_R)
    extrude(amount=-CUT_EXTRUDE15_DEPTH, mode=Mode.SUBTRACT)

    # Sketch17 → Cut-Extrude16 (cut)
    with BuildSketch(Plane.ZY.offset(50)):
        with Locations(Location((0, -52.165272983, 0), (0, 0, 293.088772437))):
            Circle(SKETCH17_R)
        with Locations(Location((0, 52.165272983, 0), (0, 0, 275.626270946))):
            Circle(SKETCH17_R)
    extrude(amount=-CUT_EXTRUDE16_DEPTH, mode=Mode.SUBTRACT)


with BuildPart() as body_2:
    # Sketch22 → Boss-Extrude7 (new body)
    with BuildSketch(Plane.XY.offset(1)):
        with Locations((-33.819006912, -0.086877249)):
            Rectangle(SKETCH22_W, SKETCH22_H)
    extrude(amount=BOSS_EXTRUDE7_DEPTH)

    # Sketch23 → Cut-Extrude17 (cut)
    with BuildSketch(Plane(origin=(-22.546004608, 0, 0), x_dir=(0, 0, -1), z_dir=(1, 0, 0))):
        with Locations((-9.070275609, -0.09965853)):
            Rectangle(SKETCH23_W, SKETCH23_H)
    extrude(amount=-CUT_EXTRUDE17_DEPTH, mode=Mode.SUBTRACT)


with BuildPart() as body_3:
    # Sketch22 → Boss-Extrude7 2 (new body)
    with BuildSketch(Plane.XY.offset(1)):
        with Locations((33.819006912, -0.086877249)):
            Rectangle(SKETCH22_W, SKETCH22_H)
    extrude(amount=BOSS_EXTRUDE7_2_DEPTH)

    # Sketch24 → Cut-Extrude18 (cut)
    with BuildSketch(Plane.ZY.offset(-22.546004608)):
        with Locations((9.143154752, 0.150993818)):
            Rectangle(SKETCH24_W, SKETCH24_H)
    extrude(amount=-CUT_EXTRUDE18_DEPTH, mode=Mode.SUBTRACT)


solid = Compound([part.part, body_2.part, body_3.part])
